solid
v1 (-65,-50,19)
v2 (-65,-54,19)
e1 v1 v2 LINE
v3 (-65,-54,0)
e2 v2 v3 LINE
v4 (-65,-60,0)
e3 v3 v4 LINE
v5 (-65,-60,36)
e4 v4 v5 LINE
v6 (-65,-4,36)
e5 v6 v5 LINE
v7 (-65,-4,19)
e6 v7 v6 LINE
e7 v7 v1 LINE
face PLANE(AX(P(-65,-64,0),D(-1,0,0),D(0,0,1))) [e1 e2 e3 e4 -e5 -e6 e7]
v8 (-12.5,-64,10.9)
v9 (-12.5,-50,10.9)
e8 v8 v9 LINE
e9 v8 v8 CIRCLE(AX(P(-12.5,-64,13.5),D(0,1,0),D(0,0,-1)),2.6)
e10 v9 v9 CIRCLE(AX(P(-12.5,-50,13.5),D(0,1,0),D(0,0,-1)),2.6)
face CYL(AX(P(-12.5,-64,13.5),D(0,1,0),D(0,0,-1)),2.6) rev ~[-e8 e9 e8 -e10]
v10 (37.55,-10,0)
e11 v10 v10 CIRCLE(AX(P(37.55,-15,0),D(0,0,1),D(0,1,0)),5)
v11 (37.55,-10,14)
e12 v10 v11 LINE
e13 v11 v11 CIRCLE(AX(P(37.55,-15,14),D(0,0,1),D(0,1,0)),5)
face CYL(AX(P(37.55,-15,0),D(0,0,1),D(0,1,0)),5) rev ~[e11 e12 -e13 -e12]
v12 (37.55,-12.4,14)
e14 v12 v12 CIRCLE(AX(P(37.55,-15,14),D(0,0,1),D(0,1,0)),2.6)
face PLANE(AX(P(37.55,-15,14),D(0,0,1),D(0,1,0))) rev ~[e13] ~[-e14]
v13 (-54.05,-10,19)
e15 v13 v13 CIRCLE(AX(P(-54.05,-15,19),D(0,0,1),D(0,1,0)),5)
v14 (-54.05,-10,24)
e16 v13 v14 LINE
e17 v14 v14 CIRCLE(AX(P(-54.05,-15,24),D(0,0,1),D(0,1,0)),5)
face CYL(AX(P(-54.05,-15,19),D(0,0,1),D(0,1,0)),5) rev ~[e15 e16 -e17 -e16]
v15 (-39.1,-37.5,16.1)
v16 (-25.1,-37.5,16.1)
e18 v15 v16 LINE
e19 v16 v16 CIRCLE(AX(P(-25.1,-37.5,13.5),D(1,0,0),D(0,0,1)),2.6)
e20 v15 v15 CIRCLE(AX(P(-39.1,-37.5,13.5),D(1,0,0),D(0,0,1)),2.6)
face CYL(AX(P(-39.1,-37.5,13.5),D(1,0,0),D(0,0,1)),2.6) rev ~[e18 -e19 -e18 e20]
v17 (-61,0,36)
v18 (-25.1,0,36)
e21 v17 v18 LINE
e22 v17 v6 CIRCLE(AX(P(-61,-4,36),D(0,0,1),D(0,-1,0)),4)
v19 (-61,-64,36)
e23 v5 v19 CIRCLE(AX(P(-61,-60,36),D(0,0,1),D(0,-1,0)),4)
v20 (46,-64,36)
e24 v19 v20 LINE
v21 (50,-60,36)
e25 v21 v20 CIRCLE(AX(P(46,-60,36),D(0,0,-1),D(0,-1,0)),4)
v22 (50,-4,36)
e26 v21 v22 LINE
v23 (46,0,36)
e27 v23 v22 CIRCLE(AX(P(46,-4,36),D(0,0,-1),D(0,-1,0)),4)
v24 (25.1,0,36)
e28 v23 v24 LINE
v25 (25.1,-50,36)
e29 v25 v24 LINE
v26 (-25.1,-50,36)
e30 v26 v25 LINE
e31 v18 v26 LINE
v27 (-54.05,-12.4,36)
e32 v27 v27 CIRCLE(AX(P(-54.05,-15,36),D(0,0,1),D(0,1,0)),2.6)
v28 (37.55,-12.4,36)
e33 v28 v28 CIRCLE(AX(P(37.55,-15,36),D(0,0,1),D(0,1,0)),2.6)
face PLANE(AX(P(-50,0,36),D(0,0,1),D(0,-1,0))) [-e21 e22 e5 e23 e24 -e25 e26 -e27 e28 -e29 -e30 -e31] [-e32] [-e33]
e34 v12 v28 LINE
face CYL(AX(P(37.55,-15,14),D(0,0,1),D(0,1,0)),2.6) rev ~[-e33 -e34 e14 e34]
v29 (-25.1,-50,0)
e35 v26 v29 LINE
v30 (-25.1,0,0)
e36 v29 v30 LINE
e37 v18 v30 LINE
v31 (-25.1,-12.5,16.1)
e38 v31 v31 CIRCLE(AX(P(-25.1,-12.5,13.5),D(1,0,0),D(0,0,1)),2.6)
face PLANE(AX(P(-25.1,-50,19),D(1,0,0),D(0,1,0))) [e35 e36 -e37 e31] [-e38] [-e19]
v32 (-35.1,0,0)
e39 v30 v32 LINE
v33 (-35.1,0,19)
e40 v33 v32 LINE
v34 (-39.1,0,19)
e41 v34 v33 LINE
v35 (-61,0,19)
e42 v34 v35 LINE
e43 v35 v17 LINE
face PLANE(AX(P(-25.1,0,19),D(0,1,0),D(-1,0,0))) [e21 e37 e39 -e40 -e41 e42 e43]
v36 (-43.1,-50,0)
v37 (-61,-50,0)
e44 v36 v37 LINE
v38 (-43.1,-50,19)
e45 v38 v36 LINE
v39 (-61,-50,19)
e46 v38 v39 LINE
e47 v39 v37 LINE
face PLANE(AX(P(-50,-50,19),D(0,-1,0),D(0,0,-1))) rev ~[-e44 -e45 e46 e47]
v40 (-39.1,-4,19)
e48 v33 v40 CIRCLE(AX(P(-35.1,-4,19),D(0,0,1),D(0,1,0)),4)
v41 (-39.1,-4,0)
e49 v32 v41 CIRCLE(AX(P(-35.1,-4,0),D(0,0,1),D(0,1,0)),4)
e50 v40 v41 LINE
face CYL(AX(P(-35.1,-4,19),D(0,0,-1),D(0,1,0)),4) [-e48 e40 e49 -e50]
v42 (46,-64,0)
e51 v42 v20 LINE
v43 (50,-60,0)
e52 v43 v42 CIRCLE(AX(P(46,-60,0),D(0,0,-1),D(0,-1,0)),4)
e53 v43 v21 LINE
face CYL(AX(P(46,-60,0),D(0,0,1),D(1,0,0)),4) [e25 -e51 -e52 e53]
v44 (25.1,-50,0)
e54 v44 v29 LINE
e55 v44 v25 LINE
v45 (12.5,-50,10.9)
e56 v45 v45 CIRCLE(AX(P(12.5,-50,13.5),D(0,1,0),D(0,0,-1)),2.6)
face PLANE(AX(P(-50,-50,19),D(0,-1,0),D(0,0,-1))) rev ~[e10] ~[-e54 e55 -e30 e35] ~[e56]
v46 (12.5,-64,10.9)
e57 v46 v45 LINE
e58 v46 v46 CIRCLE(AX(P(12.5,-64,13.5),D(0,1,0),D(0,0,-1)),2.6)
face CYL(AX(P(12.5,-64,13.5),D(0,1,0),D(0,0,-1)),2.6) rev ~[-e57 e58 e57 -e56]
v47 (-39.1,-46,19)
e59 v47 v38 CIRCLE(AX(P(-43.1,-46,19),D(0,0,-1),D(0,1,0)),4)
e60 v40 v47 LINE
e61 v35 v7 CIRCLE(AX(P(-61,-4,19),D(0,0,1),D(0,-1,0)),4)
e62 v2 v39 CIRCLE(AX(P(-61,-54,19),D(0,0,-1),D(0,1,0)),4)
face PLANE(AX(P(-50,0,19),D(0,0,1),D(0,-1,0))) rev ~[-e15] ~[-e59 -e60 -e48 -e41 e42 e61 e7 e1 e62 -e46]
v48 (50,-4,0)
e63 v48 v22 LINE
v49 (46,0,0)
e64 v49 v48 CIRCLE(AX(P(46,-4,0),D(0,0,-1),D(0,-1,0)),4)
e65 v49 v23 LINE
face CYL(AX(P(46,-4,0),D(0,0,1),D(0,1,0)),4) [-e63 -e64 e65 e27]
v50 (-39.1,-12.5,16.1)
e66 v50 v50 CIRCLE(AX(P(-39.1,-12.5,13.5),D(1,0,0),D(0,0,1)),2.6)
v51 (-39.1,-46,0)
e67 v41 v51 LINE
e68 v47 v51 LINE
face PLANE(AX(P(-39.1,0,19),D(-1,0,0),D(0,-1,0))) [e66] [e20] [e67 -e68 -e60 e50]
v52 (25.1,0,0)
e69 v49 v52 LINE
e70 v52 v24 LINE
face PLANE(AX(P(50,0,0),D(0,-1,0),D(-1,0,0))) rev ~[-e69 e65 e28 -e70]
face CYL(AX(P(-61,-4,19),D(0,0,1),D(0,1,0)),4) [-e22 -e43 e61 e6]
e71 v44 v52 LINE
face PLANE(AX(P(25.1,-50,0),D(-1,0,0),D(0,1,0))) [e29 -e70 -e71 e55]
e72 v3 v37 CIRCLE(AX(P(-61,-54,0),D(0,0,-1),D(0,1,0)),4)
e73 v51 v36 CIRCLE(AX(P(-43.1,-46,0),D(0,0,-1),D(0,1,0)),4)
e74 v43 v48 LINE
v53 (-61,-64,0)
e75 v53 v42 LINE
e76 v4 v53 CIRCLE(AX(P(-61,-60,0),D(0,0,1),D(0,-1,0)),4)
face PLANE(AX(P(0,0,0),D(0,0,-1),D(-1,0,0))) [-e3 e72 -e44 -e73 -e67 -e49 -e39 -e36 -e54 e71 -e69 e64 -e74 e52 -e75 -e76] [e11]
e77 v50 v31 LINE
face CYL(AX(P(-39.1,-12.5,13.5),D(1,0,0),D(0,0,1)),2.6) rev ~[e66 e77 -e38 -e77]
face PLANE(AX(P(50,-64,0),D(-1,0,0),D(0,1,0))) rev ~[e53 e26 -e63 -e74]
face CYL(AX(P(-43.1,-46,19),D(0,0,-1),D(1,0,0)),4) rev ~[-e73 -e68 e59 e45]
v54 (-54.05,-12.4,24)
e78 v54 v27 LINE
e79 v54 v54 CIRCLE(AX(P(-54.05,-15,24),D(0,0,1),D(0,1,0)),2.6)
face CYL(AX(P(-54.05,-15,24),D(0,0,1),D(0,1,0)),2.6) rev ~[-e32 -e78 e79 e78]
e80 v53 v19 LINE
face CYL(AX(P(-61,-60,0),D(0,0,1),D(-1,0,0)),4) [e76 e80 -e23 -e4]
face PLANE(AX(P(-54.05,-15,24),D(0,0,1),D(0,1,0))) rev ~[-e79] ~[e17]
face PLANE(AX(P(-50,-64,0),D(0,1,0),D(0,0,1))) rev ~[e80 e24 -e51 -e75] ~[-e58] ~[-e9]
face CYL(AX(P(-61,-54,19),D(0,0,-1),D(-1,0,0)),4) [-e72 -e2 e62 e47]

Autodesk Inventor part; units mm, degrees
ref_plane "YZ Plane" through (0, 0, 0) normal (1, 0, 0) x (0, 1, 0)
ref_plane "XZ Plane" through (0, 0, 0) normal (0, 1, 0) x (-1, 0, 0)
ref_plane "XY Plane" through (0, 0, 0) normal (0, 0, 1) x (1, 0, 0)
sketch "Sketch1" plane through (0, 0, 0) normal (0, 0, 1) x (1, 0, 0)
  line L0 (-50, -64) -> (50, -64)
  line L1 (50, -64) -> (50, 0)
  line L2 (50, 0) -> (-50, 0)
  line L3 (-50, 0) -> (-50, -64)
  line L4 (-50, -64) -> (50, 0) construction
  line L5 (50, -64) -> (-50, 0) construction
  line L6 (-25.1, -50) -> (25.1, -50)
  line L7 (25.1, -50) -> (25.1, 0)
  line L8 (25.1, 0) -> (-25.1, 0)
  line L9 (-25.1, 0) -> (-25.1, -50)
  line L10 (-25.1, -50) -> (25.1, 0) construction
  line L11 (25.1, -50) -> (-25.1, 0) construction
  point P0 (0, 0)
  point P1 (0, -32)
  point P2 (0, 0)
  point P3 (0, -25)
  point P4 (-25.1, 0)
  dimension "d0" = 100
  dimension "d1" = 64
  dimension "d2" = 50.2
  dimension "d3" = 50
extrude "Extrusion1" add sketch "Sketch1" along normal blind 36 contours L3 L2 L9 L6 L7 L1 L0
sketch "Sketch2" plane through (0, 0, 0) normal (0, 0, -1) x (-1, 0, 0)
  line L0 (-50, 0) -> (-25.1, 0) projected
  line L1 (-25.1, 0) -> (-25.1, -50) projected
  line L2 (-25.1, -50) -> (25.1, -50) projected
  line L3 (25.1, -50) -> (25.1, 0) projected
  line L4 (25.1, 0) -> (50, 0) projected
  line L5 (50, 0) -> (50, -64) projected
  line L6 (50, -64) -> (-50, -64) projected
  line L7 (-50, -64) -> (-50, 0) projected
  line L8 (25.1, 0) -> (50, 0)
  line L9 (50, 0) -> (50, -50)
  line L10 (50, -50) -> (25.1, -50)
  line L11 (25.1, -50) -> (25.1, 0)
  point P0 (0, 0)
  point P1 (25.1, -50)
extrude "Extrusion2" cut sketch "Sketch2" against normal blind 19 contours L3 L4 L5 L10
sketch "Sketch3" plane through (-50, -64, 0) normal (-1, 0, 0) x (0, 0, 1)
  line L0 (19, 64) -> (19, 14) projected
  line L1 (19, 14) -> (0, 14) projected
  line L2 (0, 14) -> (0, 0) projected
  line L3 (0, 0) -> (36, 0) projected
  line L4 (36, 64) -> (36, 0) projected
  line L5 (19, 64) -> (36, 64) projected
  point P0 (0, 64)
extrude "Extrusion3" add sketch "Sketch3" along normal blind 15
sketch "Sketch4" plane through (0, 0, 0) normal (0, 0, -1) x (-1, 0, 0)
  line L0 (-25.1, -50) -> (65, -50) projected
  line L1 (-25.1, 0) -> (-25.1, -50) projected
  line L2 (-50, 0) -> (-25.1, 0) projected
  line L3 (-50, -64) -> (-50, 0) projected
  line L4 (-50, -64) -> (65, -64) projected
  line L5 (65, -50) -> (65, -64) projected
  line L6 (-50, 0) -> (-25.1, 0) projected
  point P0 (0, 0)
  point P1 (-37.55, -15)
  point P2 (-37.55, 0)
  point P3 (-37.55, 0)
  dimension "d10" = 15
hole "Hole1" at (37.55, -15, 0) direction (0, 0, 1) diameter 5.2 end through all counterbore diameter 10 counterbore depth 14
sketch "Sketch5" plane through (0, 0, 19) normal (0, 0, -1) x (-1, 0, 0)
  line L0 (25.1, 0) -> (65, 0) projected
  line L1 (25.1, -50) -> (25.1, 0) projected
  line L2 (65, -50) -> (25.1, -50) projected
  line L3 (65, 0) -> (65, -50) projected
  line L4 (36.05, -15) -> (54.05, -15) construction
  point P0 (0, 0)
  point P1 (45.05, 0)
  point P2 (45.05, -15)
  dimension "d18" = 18
  dimension "d19" = 15
hole "Hole2" at (-54.05, -15, 19) direction (0, 0, 1) diameter 5.2 end through all counterbore diameter 10 counterbore depth 5
sketch "Sketch6" plane through (0, 0, 19) normal (0, 0, -1) x (-1, 0, 0)
  circle A0 centre (54.05, -15) radius 5 projected
  line L0 (25.1, 0) -> (65, 0) projected
  line L1 (25.1, -50) -> (25.1, 0) projected
  line L2 (65, -50) -> (25.1, -50) projected
  line L3 (65, 0) -> (65, -50) projected
  line L4 (25.1, 0) -> (39.1, 0)
  line L5 (39.1, 0) -> (39.1, -50)
  line L6 (39.1, -50) -> (25.1, -50)
  line L7 (25.1, -50) -> (25.1, 0)
  point P0 (0, 0)
  point P1 (39.1, 0)
  dimension "d27" = 14
extrude "Extrusion4" add sketch "Sketch6" along normal up to surface (19 mm away) contours L0 L5 L2 L1
sketch "Sketch7" plane through (-39.1, -50, 19) normal (-1, 0, 0) x (0, 0, 1)
  circle A0 centre (-5.5, 37.5) radius 2.067 projected
  circle A1 centre (-5.5, 12.5) radius 2.067 projected
  point P0 (-19, 50)
hole "Hole3" at (-39.1, -12.5, 13.5) at (-39.1, -37.5, 13.5) direction (1, 0, 0) diameter 5.2 depth 14
sketch "Sketch8" plane through (50, -64, 0) normal (0, -1, 0) x (1, 0, 0)
  circle A0 centre (-37.5, 13.5) radius 2.067 projected
  circle A1 centre (-62.5, 13.5) radius 2.067 projected
  point P0 (-50, 0)
hole "Hole4" at (12.5, -64, 13.5) at (-12.5, -64, 13.5) direction (0, 1, 0) diameter 5.2 end through all
fillet "Fillet1" radius 4 7 edges at (50, 0, 18) (50, -64, 18) (-65, -64, 18) (-65, 0, 27.5) (-39.1, -50, 9.5) (-39.1, 0, 9.5) (-65, -50, 9.5)
properties part number "lift_encoder_frame" material "ABS Plastic"
